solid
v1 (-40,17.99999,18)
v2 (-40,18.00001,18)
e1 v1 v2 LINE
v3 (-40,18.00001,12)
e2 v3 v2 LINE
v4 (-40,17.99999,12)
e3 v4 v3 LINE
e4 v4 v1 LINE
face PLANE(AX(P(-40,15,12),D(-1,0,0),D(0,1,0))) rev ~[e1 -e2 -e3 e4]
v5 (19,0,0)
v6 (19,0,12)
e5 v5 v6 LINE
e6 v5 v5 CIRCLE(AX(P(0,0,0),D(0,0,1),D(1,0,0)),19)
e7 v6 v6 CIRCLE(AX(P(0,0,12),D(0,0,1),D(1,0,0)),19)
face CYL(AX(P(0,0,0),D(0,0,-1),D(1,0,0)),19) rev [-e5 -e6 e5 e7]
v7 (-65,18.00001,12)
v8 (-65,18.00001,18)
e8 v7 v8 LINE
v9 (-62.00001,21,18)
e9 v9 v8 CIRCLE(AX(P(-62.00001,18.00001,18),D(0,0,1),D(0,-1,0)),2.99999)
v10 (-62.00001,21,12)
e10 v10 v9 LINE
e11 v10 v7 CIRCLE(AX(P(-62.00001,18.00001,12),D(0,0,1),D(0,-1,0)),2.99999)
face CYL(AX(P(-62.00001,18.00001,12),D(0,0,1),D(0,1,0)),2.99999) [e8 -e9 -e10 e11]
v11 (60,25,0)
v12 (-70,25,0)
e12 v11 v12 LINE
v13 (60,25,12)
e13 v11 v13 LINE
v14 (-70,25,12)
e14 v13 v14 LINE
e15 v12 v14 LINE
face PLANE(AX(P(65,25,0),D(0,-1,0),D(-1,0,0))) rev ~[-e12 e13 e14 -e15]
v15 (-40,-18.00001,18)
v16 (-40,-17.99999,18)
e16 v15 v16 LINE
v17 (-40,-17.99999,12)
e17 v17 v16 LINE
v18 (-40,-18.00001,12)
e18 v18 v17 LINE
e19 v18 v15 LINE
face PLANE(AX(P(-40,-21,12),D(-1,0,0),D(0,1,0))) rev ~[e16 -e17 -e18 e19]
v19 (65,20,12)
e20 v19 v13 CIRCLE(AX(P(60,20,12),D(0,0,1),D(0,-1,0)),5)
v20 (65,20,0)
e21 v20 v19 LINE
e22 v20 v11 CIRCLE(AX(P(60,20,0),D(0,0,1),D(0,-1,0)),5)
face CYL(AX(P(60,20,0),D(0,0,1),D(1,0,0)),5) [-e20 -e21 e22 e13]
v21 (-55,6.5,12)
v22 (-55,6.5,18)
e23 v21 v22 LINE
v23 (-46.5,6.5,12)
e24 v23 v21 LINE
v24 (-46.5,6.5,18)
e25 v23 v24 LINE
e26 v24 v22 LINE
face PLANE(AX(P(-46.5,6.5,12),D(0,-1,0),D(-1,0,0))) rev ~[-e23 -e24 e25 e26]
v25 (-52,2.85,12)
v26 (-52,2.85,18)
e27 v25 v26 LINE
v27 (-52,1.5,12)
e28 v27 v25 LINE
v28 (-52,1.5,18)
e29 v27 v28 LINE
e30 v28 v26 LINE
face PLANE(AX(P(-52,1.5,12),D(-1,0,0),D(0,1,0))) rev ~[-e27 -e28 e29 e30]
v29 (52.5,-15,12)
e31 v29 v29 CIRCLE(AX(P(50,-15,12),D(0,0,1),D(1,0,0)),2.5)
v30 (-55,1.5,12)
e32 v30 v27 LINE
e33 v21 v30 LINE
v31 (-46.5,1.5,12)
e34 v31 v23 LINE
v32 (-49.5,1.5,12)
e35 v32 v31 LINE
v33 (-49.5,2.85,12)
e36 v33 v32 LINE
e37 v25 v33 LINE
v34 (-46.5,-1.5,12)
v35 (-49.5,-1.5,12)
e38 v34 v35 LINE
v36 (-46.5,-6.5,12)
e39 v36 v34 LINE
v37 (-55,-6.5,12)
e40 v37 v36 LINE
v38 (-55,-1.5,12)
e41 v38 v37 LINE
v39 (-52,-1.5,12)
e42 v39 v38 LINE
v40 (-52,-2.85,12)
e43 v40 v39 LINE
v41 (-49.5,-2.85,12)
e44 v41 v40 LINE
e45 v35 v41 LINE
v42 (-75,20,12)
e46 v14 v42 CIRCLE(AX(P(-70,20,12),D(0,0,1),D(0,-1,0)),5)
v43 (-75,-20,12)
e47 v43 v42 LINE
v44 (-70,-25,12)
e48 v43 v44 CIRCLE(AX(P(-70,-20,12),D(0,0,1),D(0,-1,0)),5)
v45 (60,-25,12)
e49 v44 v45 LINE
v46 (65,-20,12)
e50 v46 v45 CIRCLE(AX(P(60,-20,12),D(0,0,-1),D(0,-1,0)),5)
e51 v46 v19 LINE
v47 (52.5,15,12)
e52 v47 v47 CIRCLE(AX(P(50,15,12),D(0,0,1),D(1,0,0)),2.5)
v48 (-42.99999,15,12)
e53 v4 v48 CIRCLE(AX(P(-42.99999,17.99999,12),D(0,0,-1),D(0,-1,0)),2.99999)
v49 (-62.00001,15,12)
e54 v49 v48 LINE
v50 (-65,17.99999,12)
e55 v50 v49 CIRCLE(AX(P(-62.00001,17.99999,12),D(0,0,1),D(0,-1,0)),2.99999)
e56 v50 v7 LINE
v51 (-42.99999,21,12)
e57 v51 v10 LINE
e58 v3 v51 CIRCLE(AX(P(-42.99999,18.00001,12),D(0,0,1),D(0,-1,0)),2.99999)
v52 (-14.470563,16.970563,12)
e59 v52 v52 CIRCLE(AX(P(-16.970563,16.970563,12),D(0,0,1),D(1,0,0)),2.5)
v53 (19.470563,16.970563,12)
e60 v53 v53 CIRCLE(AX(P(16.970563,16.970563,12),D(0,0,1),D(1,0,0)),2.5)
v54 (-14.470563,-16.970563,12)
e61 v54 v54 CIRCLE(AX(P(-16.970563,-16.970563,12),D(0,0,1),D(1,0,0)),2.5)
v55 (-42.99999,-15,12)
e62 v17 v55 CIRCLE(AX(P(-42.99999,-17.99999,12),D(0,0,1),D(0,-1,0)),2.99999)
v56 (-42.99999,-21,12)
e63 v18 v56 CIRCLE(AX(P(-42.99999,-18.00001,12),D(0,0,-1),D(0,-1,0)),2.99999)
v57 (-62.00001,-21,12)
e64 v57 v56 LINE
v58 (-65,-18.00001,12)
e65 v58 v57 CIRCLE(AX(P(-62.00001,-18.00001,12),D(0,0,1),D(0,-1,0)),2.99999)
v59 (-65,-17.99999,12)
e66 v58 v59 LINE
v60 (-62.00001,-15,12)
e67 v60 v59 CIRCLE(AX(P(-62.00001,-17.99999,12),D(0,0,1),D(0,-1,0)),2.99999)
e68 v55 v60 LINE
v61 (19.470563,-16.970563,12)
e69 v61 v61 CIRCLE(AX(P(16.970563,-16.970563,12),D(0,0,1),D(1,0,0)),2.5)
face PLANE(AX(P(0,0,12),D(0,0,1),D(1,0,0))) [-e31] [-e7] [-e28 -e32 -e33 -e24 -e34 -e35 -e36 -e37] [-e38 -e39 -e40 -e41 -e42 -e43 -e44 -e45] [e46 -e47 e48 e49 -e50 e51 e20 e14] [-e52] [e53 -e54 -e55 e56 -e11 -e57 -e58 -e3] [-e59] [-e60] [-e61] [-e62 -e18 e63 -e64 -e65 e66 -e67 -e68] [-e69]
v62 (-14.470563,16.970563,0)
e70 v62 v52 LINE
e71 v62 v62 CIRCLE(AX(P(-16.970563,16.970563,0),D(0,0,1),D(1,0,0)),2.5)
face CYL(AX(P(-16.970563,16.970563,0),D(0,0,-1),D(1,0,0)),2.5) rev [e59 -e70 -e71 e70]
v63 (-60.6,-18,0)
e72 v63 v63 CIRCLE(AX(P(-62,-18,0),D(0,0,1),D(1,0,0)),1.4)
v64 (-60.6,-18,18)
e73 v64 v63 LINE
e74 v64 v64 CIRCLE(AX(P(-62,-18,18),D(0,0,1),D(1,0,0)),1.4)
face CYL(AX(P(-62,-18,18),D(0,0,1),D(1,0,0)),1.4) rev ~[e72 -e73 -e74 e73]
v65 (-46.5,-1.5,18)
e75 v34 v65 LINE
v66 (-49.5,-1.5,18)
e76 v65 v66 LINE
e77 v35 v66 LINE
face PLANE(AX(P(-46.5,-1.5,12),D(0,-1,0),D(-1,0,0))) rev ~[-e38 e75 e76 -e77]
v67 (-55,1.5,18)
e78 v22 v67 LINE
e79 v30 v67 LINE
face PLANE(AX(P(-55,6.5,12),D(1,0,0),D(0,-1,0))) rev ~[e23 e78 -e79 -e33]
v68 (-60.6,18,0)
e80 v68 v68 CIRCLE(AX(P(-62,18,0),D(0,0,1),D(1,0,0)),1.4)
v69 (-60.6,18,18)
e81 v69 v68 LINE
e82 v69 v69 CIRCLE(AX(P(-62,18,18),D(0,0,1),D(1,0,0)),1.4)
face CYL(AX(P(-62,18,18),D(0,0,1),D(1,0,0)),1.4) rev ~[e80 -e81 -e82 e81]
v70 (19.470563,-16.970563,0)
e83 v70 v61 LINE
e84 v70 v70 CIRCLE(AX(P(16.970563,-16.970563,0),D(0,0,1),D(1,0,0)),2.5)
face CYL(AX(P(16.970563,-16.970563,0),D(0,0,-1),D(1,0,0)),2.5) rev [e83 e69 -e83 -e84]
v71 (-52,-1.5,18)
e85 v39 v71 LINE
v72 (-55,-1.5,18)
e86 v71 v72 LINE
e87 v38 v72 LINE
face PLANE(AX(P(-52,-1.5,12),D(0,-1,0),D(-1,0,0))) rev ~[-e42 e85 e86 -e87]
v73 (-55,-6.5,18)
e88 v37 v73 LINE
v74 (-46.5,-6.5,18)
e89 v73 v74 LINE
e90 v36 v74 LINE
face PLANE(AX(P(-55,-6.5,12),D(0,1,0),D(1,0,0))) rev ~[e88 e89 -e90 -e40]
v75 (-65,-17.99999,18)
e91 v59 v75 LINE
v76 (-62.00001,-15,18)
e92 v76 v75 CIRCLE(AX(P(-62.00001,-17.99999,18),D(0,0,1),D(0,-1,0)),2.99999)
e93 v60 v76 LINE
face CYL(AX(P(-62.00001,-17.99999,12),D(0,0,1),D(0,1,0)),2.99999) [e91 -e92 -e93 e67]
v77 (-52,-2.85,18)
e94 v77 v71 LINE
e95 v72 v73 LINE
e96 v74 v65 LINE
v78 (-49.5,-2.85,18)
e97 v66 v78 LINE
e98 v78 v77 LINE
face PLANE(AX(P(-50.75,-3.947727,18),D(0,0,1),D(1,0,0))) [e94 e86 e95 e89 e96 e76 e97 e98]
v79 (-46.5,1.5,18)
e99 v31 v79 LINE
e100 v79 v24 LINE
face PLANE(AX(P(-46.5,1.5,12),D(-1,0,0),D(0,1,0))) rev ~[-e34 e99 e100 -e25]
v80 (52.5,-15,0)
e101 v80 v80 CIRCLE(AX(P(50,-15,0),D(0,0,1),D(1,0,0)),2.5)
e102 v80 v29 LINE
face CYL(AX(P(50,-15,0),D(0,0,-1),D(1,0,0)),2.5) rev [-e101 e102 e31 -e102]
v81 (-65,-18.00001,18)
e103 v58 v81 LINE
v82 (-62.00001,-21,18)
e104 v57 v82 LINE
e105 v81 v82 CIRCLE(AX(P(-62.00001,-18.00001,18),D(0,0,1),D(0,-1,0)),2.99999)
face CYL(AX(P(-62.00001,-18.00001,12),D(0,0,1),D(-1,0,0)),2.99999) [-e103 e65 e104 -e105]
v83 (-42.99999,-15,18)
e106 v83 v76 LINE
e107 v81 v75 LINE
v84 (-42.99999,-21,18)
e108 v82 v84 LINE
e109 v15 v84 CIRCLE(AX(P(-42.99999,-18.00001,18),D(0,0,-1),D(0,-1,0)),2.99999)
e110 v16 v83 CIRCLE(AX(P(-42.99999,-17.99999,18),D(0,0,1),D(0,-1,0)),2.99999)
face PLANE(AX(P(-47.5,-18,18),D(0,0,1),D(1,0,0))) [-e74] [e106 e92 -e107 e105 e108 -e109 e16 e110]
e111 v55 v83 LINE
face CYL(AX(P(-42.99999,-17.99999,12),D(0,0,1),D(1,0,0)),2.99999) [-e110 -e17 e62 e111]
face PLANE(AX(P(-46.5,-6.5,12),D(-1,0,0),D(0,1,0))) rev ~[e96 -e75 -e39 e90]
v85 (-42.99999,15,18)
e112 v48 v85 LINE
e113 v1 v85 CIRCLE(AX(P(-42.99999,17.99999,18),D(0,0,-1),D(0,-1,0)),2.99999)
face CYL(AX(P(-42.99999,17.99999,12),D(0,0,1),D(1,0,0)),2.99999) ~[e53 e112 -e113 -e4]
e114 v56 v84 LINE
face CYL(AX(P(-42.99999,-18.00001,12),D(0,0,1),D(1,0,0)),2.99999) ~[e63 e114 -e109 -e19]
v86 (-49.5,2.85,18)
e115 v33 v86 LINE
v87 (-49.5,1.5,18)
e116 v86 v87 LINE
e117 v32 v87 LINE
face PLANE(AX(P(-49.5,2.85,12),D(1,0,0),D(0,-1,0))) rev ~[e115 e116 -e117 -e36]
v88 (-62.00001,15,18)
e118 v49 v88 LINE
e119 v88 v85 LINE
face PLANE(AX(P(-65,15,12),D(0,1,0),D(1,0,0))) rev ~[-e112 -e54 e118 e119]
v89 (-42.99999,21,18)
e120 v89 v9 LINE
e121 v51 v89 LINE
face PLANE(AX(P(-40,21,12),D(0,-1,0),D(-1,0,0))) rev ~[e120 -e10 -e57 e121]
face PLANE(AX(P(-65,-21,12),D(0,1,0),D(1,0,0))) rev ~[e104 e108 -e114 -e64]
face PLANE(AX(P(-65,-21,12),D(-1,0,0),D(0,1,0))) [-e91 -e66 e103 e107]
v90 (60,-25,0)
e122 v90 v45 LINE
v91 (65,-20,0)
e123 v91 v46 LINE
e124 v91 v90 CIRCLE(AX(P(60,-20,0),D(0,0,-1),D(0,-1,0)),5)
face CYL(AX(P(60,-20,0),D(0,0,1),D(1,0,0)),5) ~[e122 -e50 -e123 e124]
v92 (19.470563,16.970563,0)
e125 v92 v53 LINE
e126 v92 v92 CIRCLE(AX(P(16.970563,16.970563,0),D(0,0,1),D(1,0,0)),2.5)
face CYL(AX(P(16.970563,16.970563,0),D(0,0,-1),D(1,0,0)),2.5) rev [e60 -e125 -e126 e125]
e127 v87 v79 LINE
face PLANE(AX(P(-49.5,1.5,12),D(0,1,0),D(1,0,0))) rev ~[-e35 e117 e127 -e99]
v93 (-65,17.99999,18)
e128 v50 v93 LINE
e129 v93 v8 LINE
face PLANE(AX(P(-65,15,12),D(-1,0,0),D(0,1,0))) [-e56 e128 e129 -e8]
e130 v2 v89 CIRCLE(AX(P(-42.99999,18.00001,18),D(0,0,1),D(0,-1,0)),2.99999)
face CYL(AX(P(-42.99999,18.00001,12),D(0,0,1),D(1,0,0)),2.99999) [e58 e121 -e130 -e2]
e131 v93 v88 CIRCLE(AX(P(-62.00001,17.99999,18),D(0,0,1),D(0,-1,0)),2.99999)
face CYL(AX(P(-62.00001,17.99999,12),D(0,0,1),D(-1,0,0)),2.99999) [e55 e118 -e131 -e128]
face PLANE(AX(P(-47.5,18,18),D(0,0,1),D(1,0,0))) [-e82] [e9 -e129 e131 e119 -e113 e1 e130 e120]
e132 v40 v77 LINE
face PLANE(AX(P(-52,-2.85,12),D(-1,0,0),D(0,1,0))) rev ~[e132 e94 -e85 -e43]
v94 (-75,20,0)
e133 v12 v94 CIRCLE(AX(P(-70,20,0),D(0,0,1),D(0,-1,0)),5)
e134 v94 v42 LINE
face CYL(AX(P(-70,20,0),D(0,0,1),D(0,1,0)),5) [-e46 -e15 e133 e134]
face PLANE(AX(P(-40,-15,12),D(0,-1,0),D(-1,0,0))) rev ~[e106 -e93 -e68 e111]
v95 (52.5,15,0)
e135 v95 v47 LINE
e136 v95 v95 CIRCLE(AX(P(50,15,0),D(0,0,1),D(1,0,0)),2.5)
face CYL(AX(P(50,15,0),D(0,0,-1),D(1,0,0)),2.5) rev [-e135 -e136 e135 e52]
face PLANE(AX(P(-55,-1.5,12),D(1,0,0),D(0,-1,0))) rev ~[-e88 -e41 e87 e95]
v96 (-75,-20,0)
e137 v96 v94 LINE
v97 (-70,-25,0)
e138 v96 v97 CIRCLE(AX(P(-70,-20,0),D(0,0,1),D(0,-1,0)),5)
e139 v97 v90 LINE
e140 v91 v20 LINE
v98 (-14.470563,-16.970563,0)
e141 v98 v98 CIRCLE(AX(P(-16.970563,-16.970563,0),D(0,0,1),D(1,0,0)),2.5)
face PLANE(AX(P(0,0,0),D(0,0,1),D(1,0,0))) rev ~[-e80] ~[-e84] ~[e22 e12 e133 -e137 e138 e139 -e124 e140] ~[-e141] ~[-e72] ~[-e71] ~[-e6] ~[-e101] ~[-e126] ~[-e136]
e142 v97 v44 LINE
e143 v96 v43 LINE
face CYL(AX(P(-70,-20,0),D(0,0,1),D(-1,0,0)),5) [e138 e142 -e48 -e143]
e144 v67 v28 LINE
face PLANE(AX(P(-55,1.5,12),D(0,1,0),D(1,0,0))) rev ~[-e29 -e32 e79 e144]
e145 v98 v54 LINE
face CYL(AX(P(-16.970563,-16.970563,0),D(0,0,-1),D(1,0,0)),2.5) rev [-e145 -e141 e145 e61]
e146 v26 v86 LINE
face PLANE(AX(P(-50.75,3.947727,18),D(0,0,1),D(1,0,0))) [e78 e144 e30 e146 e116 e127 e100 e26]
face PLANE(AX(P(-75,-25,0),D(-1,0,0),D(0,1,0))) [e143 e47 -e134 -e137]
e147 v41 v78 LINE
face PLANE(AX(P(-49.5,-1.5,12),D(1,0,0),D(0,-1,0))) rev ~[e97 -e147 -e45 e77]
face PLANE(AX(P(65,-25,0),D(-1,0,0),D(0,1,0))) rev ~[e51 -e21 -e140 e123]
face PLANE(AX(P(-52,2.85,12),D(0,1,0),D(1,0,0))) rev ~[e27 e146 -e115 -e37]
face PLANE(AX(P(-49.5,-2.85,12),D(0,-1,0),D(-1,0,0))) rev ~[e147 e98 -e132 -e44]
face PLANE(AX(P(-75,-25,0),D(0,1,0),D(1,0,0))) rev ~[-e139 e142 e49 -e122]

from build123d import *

# Parameters (mm, degrees)
F0_W     = 50
F0_H     = 50
F0_R     = 2.5
F0_R_2   = 19
F0_W_2   = 40
F1_DEPTH = 12
F2_R     = 5
F3_W     = 15
F3_H     = 6
F3_W_2   = 10
F4_DEPTH = 6
F5_R     = 2.99999
F6_R     = 1.4
F7_DEPTH = 18


# Not quite as in the source:
# - a fillet or chamfer is up to 0.001 mm smaller than in the source, because OpenCascade refuses the exact size


with BuildPart() as f1:
    # F0 (on Top) → F1 (new body)
    with BuildSketch(Plane.XY):
        Rectangle(F0_W, F0_H)
        with Locations((-16.9705627485, -16.9705627485)):
            Circle(F0_R, mode=Mode.SUBTRACT)
        with Locations((16.9705627485, -16.9705627485)):
            Circle(F0_R, mode=Mode.SUBTRACT)
        with Locations((-16.9705627485, 16.9705627485)):
            Circle(F0_R, mode=Mode.SUBTRACT)
        Circle(F0_R_2, mode=Mode.SUBTRACT)
        with Locations((16.9705627485, 16.9705627485)):
            Circle(F0_R, mode=Mode.SUBTRACT)
        with Locations((45, 0)):
            Rectangle(F0_W_2, F0_H)
        with Locations((50, -15)):
            Circle(F0_R, mode=Mode.SUBTRACT)
        with Locations((50, 15)):
            Circle(F0_R, mode=Mode.SUBTRACT)
        with Locations((-50, 0)):
            Rectangle(F0_W, F0_H)
    extrude(amount=F1_DEPTH)

    # F2
    f2_edges = [f1.edges().sort_by_distance(p)[0] for p in [
        (65, -25, 6),
        (65, 25, 6),
        (-75, -25, 6),
        (-75, 25, 6),
    ]]
    fillet(f2_edges, radius=F2_R)

    # F3 (on face) → F4 (join)
    with BuildSketch(Plane.XY.offset(12)):
        with Locations((-47.5, 18)):
            Rectangle(F3_W, F3_H)
        with Locations((-60, 18)):
            Rectangle(F3_W_2, F3_H)
        with Locations((-47.5, -18)):
            Rectangle(F3_W, F3_H)
        with Locations((-60, -18)):
            Rectangle(F3_W_2, F3_H)
        Polygon((-46.5, 6.5), (-55, 6.5), (-55, 1.5), (-52, 1.5), (-52, 2.85), (-49.5, 2.85), (-49.5, 1.5), (-46.5, 1.5), align=None)
        Polygon((-46.5, -6.5), (-46.5, -1.5), (-49.5, -1.5), (-49.5, -2.85), (-52, -2.85), (-52, -1.5), (-55, -1.5), (-55, -6.5), align=None)
    extrude(amount=F4_DEPTH)

    # F5 (radius 3 in the source; OpenCascade refuses exactly that, so slightly less here)
    f5_edges = [f1.edges().sort_by_distance(p)[0] for p in [
        (-65, 21, 15),
        (-65, 15, 15),
        (-40, 15, 15),
        (-65, -15, 15),
        (-65, -21, 15),
        (-40, -21, 15),
        (-40, -15, 15),
        (-40, 21, 15),
    ]]
    fillet(f5_edges, radius=F5_R)

    # F6 (on face) → F7 (cut, through all)
    with BuildSketch(Plane.XY.offset(18)):
        with Locations((-62, 18)):
            Circle(F6_R)
        with Locations((-62, -18)):
            Circle(F6_R)
    extrude(amount=-F7_DEPTH, mode=Mode.SUBTRACT)


solid = f1.part
